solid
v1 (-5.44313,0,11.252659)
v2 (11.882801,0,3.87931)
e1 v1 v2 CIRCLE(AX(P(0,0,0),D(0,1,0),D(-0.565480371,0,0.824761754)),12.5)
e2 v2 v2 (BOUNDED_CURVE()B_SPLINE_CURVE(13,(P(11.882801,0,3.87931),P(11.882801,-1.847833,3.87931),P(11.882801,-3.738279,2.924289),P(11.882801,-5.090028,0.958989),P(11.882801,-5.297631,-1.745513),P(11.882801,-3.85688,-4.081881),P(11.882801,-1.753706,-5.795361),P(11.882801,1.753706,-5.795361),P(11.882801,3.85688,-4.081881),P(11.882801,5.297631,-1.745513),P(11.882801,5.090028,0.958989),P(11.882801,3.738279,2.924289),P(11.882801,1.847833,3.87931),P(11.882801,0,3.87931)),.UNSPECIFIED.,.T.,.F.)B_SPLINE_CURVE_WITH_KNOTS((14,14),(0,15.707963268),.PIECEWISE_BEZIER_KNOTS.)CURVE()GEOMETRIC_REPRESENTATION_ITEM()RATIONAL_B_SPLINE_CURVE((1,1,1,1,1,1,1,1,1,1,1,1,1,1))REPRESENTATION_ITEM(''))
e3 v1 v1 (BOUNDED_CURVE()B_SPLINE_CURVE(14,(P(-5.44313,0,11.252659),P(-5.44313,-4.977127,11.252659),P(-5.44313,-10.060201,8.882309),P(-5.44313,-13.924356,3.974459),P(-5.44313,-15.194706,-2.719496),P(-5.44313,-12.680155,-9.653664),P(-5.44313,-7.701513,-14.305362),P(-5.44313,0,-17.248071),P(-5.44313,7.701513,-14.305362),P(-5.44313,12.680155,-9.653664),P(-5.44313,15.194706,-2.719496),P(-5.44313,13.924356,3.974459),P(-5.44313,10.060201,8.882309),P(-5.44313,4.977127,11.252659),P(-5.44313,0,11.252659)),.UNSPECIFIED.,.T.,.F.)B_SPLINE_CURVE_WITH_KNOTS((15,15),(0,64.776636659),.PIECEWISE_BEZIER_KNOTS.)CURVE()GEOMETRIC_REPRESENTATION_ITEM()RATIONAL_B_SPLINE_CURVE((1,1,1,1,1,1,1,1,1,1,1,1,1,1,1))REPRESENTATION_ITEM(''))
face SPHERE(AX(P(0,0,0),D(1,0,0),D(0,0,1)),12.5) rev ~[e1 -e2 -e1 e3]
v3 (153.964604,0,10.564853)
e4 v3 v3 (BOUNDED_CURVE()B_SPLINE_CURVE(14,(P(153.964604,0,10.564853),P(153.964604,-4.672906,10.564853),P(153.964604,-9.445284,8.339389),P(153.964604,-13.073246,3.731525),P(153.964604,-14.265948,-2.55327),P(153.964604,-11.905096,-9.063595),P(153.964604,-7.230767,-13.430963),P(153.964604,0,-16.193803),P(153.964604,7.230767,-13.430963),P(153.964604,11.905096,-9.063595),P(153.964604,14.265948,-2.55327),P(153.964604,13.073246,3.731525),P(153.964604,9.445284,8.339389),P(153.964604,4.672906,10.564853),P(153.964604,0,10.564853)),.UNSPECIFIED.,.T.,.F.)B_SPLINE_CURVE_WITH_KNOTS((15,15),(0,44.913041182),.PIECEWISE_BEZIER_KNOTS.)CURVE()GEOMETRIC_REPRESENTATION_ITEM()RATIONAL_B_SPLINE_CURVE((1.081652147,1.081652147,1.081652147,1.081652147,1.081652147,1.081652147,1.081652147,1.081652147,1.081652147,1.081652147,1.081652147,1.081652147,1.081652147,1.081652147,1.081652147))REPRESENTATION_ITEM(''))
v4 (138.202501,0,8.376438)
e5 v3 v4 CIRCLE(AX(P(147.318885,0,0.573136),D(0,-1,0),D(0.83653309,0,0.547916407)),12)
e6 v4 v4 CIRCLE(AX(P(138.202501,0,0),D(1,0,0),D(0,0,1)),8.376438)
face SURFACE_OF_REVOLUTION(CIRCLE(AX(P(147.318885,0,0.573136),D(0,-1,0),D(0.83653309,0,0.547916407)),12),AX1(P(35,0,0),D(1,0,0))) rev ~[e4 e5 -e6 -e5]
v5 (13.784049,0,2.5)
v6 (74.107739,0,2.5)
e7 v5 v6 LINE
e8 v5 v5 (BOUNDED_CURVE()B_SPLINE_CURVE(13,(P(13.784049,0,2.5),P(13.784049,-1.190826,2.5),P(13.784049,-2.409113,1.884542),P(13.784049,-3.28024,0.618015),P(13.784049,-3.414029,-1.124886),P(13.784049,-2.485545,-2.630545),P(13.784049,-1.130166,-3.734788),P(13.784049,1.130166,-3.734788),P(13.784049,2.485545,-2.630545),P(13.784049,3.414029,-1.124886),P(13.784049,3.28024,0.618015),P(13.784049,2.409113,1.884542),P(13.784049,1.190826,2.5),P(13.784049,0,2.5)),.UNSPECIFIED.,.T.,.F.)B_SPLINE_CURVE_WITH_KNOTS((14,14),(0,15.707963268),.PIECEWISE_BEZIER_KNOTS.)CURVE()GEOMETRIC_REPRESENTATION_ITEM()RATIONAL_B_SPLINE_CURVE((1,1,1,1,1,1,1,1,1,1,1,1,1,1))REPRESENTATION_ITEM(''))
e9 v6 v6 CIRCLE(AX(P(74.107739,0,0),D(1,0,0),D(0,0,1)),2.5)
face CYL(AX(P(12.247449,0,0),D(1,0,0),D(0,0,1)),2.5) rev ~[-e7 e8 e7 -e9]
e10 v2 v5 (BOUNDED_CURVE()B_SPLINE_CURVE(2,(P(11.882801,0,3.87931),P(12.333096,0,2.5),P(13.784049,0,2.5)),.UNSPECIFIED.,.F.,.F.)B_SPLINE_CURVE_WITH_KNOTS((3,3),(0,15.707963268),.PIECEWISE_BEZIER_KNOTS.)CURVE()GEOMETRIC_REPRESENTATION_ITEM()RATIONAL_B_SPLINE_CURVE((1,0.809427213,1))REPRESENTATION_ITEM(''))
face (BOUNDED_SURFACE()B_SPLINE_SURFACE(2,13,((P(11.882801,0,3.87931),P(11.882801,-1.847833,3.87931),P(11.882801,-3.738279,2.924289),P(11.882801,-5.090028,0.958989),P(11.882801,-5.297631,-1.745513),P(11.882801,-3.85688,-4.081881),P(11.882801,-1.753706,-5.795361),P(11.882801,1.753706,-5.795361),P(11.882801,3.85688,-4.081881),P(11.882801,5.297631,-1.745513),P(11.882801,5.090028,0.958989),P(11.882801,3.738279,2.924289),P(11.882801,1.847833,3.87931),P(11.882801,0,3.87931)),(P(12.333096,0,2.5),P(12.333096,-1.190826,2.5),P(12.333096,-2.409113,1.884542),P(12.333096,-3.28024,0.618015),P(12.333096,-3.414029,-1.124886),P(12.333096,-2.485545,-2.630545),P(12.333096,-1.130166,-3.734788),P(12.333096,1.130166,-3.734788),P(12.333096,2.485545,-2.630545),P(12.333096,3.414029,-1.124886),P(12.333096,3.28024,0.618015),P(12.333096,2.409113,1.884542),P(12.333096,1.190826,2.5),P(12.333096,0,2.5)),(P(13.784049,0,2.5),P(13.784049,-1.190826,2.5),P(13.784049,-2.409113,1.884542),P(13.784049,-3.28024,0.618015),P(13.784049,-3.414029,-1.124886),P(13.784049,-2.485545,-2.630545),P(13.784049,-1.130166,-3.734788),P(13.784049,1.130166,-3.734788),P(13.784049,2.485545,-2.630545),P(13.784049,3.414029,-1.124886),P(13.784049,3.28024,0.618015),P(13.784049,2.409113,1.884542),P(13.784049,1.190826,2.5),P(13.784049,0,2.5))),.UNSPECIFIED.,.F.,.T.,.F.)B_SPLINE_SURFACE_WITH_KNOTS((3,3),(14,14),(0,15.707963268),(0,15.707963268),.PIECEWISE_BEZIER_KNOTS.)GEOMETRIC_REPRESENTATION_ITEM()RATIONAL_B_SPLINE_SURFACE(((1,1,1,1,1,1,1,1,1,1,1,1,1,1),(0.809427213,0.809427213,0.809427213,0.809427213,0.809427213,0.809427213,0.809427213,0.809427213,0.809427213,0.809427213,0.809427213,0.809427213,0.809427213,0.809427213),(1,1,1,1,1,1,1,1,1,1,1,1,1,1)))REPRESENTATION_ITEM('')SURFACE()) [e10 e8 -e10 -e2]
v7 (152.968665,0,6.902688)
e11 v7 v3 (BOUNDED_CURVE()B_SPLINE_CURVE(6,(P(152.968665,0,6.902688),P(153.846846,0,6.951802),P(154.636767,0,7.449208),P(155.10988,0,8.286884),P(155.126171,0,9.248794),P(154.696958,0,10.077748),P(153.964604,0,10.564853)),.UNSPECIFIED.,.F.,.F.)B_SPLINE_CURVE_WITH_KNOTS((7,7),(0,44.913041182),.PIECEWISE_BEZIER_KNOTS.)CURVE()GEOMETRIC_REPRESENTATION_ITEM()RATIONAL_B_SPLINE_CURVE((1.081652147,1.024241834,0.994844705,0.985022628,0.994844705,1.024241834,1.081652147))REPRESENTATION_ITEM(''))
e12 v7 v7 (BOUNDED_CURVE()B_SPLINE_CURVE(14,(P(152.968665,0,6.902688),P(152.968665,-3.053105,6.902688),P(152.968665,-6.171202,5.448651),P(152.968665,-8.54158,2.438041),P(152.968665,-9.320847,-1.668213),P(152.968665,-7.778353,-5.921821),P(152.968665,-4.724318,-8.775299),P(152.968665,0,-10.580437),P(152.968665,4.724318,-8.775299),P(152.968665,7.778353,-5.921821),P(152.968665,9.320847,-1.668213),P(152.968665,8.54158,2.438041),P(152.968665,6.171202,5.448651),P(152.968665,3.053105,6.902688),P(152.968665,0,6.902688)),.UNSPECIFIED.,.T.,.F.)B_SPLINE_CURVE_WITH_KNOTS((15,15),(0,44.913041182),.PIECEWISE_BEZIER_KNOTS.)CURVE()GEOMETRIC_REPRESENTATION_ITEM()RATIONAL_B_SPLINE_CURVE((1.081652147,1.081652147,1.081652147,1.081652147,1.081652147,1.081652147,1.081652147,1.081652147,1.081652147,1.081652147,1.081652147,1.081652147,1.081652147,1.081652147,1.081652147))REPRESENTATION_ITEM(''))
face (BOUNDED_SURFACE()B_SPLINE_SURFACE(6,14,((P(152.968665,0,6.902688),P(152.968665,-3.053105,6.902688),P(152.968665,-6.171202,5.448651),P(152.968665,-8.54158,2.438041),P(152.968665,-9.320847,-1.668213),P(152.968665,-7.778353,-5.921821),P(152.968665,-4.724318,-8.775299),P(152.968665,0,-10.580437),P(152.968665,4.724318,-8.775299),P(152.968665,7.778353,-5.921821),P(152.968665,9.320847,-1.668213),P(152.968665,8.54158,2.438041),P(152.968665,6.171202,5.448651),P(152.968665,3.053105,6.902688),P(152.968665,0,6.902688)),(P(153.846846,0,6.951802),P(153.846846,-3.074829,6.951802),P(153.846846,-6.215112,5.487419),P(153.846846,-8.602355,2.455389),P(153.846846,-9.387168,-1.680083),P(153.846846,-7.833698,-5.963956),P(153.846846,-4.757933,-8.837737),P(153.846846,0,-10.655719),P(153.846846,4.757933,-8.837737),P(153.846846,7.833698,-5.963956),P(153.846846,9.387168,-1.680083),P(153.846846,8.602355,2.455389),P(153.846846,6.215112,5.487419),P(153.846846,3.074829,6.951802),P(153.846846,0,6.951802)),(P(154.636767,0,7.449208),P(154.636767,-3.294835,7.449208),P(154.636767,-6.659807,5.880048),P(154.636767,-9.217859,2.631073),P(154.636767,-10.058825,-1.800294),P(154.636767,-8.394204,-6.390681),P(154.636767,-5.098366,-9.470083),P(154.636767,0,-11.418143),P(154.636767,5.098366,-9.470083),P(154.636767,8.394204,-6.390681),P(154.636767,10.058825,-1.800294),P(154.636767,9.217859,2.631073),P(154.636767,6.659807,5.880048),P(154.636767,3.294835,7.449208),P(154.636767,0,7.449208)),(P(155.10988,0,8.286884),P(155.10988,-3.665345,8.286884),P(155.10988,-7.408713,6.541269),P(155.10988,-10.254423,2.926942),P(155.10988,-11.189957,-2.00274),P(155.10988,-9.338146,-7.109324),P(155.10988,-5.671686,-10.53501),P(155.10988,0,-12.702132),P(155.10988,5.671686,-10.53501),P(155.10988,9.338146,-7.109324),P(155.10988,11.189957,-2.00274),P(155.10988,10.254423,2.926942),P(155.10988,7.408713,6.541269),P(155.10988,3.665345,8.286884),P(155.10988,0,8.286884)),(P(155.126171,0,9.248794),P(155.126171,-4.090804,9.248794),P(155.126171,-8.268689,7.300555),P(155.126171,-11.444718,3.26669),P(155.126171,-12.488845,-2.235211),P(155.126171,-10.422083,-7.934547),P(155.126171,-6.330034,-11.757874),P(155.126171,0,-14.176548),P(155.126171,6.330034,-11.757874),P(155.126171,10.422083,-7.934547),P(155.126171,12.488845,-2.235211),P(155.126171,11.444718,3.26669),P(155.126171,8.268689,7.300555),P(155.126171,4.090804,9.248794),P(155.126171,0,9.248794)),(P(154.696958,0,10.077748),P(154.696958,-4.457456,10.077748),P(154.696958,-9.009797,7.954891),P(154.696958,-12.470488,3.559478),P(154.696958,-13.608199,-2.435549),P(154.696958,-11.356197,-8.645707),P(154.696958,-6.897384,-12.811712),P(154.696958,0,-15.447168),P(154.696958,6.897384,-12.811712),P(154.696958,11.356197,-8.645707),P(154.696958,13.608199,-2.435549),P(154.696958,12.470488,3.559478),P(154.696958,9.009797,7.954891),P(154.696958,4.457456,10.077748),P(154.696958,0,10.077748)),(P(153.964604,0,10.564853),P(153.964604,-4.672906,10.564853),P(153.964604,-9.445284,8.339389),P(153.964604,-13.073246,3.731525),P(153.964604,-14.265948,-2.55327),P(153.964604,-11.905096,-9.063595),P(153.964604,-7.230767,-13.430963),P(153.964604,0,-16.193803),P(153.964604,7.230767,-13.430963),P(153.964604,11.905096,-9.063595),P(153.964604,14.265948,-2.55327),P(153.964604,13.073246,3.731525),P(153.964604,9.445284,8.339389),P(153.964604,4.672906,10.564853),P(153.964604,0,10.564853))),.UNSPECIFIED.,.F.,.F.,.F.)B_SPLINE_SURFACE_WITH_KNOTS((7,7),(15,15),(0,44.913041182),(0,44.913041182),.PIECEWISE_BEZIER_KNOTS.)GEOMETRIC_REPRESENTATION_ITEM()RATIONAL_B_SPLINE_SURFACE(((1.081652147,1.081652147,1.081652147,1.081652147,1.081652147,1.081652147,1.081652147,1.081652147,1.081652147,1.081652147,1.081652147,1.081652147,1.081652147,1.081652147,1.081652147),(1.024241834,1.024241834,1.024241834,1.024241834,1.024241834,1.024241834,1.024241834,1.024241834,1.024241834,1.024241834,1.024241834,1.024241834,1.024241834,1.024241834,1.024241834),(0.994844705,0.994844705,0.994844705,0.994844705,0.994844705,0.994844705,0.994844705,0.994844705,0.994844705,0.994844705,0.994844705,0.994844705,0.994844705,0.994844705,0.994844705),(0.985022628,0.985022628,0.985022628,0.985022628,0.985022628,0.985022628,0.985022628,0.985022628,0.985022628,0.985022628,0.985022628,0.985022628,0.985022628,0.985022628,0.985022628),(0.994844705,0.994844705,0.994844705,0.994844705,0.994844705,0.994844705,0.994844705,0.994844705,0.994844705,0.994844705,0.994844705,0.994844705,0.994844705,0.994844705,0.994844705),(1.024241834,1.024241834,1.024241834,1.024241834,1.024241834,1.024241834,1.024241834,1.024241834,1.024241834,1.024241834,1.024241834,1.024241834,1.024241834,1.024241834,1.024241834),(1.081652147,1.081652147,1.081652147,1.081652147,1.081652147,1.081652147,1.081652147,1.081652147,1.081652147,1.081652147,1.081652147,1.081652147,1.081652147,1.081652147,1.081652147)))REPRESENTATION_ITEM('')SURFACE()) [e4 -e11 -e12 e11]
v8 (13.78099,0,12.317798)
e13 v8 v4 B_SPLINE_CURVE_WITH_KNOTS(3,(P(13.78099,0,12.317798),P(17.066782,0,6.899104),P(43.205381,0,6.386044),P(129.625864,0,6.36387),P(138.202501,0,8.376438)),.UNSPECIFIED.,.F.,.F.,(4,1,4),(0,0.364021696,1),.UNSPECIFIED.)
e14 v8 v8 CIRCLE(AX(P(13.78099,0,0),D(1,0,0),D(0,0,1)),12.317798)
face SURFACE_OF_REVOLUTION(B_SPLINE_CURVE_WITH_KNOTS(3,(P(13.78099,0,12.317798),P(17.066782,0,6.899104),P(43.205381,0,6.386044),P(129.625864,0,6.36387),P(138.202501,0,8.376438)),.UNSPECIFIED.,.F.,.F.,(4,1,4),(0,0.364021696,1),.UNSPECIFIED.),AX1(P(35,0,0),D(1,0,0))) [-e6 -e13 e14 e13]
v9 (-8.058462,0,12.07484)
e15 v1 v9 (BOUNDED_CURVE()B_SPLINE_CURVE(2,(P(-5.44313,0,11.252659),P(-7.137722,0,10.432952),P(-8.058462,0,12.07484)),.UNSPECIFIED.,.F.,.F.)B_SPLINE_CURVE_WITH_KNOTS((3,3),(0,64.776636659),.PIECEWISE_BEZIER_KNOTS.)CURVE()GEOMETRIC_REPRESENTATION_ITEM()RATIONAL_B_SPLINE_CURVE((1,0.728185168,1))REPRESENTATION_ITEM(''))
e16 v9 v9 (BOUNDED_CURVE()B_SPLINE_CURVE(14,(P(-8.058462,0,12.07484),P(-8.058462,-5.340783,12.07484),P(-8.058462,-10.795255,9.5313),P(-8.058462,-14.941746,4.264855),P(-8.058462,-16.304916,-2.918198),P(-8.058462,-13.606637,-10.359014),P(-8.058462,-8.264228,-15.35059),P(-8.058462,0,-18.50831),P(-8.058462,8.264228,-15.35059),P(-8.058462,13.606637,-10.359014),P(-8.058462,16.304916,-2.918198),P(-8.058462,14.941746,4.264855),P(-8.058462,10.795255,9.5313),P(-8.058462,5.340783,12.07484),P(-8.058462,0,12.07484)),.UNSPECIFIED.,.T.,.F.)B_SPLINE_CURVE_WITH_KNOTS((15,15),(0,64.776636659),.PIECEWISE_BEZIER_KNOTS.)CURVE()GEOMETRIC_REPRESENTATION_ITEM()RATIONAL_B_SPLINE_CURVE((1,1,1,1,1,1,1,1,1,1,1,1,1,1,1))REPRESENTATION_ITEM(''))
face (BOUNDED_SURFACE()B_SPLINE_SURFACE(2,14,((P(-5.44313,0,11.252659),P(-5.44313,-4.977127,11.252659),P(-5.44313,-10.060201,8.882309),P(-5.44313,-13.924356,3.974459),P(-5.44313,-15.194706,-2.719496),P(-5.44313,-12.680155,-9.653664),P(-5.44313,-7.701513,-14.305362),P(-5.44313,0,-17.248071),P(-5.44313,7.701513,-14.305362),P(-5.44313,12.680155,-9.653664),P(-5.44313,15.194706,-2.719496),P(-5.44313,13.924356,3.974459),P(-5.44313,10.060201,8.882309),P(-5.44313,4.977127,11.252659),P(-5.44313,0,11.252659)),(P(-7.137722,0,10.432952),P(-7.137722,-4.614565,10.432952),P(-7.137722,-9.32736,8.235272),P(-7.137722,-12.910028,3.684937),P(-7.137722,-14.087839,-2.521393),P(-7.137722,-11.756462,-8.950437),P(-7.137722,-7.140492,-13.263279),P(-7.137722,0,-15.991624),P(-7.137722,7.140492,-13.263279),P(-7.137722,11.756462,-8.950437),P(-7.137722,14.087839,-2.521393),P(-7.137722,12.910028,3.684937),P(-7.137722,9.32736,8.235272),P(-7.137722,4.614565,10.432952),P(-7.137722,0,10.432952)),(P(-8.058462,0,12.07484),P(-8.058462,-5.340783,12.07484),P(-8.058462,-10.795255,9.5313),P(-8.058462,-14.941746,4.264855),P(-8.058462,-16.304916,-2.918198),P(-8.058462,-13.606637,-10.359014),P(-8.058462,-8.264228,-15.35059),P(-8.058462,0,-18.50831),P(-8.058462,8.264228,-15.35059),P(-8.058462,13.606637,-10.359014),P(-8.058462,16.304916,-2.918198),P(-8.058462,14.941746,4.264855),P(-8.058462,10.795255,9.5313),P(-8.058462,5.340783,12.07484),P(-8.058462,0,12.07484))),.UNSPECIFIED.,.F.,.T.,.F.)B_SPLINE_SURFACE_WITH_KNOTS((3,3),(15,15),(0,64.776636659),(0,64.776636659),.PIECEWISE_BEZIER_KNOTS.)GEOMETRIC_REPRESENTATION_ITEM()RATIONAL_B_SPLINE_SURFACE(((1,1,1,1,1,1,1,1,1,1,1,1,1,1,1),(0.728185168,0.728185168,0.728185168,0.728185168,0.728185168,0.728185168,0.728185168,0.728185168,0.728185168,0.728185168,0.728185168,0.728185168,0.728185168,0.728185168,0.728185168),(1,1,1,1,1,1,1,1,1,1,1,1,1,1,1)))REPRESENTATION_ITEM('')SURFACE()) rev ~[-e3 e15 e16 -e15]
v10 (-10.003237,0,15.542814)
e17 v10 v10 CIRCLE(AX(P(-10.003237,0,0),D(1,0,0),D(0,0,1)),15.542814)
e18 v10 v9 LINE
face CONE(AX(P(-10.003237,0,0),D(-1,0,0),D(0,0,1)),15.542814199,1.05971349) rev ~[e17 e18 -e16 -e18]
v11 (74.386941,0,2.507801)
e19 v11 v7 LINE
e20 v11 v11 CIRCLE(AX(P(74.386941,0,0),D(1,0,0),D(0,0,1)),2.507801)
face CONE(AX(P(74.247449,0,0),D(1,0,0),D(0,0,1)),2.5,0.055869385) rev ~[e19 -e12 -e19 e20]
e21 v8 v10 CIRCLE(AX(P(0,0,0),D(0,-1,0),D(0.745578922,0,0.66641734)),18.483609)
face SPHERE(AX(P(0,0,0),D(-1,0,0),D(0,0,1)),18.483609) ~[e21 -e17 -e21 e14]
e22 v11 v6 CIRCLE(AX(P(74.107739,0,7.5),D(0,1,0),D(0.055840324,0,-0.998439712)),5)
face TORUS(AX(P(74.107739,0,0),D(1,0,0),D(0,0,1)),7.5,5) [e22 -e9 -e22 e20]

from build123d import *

# Parameters (mm, degrees)
F2_R = 2


# Not quite as in the source:
# - a fillet or chamfer that OpenCascade refuses, or shapes differently, is made with other operations: its cross-section is extruded or revolved along the edge and cut away or added


with BuildPart() as f1:
    # F0 (on Front) → F1 (revolve)
    with BuildSketch(Plane.XZ):
        with BuildLine():
            ThreePointArc((-7.0685046336, 10.3095219212), (4.6853520259, 11.5886788028), (12.2474487139, 2.5))
            Line((12.2474487139, 2.5), (74.2474487139, 2.5))
            Line((74.2474487139, 2.5), (157.3572822072, 7.1481325134))
            ThreePointArc((157.3572822072, 7.1481325134), (148.0868112725, 12.5485391429), (138.2025005846, 8.3764383123))
            add(Edge.make_bspline(
                [(13.7809895682, 12.3177978136), (17.0667820514, 6.8991035875), (43.2053805171, 6.3860439818), (129.6258643455, 6.3638695803), (138.2025005846, 8.3764383123)],
                knots=[0, 0, 0, 0, 0.3640216959, 1, 1, 1, 1], degree=3))
            ThreePointArc((13.7809895682, 12.3177978136), (2.4835532955, 18.3159979112), (-10.003236638, 15.5428141988))
            Line((-10.003236638, 15.5428141988), (-7.0685046336, 10.3095219212))
        make_face()
    revolve(axis=Axis((35, 0, 0), (1, 0, 0)))

    # F2
    f2_edges = [f1.edges().sort_by_distance(p)[0] for p in [
        (157.357282, 0, -7.148133),
        (-7.068505, 0, -10.309522),
        (12.247449, 0, -2.5),
    ]]
    fillet(f2_edges, radius=F2_R)

    # F3: fillet of radius 5 on 1 edges, made by hand

    # F3_s1 → F3_t2 (revolve, cut)
    with BuildSketch(Plane.XZ):
        with BuildLine():
            ThreePointArc((74.3869405319, 2.5078014409), (74.2473942064, 2.5019507408), (74.1077389084, 2.5))
            Line((74.1077389084, 2.5), (74.1077389084, 2.4))
            Line((74.1077389084, 2.4), (74.25024291, 2.4))
            Line((74.25024291, 2.4), (74.3925245643, 2.4079574697))
            Line((74.3925245643, 2.4079574697), (74.3869405319, 2.5078014409))
        make_face()
    revolve(axis=Axis((74.2474487139, 0, 0), (1, 0, 0)), mode=Mode.SUBTRACT)


solid = f1.part
